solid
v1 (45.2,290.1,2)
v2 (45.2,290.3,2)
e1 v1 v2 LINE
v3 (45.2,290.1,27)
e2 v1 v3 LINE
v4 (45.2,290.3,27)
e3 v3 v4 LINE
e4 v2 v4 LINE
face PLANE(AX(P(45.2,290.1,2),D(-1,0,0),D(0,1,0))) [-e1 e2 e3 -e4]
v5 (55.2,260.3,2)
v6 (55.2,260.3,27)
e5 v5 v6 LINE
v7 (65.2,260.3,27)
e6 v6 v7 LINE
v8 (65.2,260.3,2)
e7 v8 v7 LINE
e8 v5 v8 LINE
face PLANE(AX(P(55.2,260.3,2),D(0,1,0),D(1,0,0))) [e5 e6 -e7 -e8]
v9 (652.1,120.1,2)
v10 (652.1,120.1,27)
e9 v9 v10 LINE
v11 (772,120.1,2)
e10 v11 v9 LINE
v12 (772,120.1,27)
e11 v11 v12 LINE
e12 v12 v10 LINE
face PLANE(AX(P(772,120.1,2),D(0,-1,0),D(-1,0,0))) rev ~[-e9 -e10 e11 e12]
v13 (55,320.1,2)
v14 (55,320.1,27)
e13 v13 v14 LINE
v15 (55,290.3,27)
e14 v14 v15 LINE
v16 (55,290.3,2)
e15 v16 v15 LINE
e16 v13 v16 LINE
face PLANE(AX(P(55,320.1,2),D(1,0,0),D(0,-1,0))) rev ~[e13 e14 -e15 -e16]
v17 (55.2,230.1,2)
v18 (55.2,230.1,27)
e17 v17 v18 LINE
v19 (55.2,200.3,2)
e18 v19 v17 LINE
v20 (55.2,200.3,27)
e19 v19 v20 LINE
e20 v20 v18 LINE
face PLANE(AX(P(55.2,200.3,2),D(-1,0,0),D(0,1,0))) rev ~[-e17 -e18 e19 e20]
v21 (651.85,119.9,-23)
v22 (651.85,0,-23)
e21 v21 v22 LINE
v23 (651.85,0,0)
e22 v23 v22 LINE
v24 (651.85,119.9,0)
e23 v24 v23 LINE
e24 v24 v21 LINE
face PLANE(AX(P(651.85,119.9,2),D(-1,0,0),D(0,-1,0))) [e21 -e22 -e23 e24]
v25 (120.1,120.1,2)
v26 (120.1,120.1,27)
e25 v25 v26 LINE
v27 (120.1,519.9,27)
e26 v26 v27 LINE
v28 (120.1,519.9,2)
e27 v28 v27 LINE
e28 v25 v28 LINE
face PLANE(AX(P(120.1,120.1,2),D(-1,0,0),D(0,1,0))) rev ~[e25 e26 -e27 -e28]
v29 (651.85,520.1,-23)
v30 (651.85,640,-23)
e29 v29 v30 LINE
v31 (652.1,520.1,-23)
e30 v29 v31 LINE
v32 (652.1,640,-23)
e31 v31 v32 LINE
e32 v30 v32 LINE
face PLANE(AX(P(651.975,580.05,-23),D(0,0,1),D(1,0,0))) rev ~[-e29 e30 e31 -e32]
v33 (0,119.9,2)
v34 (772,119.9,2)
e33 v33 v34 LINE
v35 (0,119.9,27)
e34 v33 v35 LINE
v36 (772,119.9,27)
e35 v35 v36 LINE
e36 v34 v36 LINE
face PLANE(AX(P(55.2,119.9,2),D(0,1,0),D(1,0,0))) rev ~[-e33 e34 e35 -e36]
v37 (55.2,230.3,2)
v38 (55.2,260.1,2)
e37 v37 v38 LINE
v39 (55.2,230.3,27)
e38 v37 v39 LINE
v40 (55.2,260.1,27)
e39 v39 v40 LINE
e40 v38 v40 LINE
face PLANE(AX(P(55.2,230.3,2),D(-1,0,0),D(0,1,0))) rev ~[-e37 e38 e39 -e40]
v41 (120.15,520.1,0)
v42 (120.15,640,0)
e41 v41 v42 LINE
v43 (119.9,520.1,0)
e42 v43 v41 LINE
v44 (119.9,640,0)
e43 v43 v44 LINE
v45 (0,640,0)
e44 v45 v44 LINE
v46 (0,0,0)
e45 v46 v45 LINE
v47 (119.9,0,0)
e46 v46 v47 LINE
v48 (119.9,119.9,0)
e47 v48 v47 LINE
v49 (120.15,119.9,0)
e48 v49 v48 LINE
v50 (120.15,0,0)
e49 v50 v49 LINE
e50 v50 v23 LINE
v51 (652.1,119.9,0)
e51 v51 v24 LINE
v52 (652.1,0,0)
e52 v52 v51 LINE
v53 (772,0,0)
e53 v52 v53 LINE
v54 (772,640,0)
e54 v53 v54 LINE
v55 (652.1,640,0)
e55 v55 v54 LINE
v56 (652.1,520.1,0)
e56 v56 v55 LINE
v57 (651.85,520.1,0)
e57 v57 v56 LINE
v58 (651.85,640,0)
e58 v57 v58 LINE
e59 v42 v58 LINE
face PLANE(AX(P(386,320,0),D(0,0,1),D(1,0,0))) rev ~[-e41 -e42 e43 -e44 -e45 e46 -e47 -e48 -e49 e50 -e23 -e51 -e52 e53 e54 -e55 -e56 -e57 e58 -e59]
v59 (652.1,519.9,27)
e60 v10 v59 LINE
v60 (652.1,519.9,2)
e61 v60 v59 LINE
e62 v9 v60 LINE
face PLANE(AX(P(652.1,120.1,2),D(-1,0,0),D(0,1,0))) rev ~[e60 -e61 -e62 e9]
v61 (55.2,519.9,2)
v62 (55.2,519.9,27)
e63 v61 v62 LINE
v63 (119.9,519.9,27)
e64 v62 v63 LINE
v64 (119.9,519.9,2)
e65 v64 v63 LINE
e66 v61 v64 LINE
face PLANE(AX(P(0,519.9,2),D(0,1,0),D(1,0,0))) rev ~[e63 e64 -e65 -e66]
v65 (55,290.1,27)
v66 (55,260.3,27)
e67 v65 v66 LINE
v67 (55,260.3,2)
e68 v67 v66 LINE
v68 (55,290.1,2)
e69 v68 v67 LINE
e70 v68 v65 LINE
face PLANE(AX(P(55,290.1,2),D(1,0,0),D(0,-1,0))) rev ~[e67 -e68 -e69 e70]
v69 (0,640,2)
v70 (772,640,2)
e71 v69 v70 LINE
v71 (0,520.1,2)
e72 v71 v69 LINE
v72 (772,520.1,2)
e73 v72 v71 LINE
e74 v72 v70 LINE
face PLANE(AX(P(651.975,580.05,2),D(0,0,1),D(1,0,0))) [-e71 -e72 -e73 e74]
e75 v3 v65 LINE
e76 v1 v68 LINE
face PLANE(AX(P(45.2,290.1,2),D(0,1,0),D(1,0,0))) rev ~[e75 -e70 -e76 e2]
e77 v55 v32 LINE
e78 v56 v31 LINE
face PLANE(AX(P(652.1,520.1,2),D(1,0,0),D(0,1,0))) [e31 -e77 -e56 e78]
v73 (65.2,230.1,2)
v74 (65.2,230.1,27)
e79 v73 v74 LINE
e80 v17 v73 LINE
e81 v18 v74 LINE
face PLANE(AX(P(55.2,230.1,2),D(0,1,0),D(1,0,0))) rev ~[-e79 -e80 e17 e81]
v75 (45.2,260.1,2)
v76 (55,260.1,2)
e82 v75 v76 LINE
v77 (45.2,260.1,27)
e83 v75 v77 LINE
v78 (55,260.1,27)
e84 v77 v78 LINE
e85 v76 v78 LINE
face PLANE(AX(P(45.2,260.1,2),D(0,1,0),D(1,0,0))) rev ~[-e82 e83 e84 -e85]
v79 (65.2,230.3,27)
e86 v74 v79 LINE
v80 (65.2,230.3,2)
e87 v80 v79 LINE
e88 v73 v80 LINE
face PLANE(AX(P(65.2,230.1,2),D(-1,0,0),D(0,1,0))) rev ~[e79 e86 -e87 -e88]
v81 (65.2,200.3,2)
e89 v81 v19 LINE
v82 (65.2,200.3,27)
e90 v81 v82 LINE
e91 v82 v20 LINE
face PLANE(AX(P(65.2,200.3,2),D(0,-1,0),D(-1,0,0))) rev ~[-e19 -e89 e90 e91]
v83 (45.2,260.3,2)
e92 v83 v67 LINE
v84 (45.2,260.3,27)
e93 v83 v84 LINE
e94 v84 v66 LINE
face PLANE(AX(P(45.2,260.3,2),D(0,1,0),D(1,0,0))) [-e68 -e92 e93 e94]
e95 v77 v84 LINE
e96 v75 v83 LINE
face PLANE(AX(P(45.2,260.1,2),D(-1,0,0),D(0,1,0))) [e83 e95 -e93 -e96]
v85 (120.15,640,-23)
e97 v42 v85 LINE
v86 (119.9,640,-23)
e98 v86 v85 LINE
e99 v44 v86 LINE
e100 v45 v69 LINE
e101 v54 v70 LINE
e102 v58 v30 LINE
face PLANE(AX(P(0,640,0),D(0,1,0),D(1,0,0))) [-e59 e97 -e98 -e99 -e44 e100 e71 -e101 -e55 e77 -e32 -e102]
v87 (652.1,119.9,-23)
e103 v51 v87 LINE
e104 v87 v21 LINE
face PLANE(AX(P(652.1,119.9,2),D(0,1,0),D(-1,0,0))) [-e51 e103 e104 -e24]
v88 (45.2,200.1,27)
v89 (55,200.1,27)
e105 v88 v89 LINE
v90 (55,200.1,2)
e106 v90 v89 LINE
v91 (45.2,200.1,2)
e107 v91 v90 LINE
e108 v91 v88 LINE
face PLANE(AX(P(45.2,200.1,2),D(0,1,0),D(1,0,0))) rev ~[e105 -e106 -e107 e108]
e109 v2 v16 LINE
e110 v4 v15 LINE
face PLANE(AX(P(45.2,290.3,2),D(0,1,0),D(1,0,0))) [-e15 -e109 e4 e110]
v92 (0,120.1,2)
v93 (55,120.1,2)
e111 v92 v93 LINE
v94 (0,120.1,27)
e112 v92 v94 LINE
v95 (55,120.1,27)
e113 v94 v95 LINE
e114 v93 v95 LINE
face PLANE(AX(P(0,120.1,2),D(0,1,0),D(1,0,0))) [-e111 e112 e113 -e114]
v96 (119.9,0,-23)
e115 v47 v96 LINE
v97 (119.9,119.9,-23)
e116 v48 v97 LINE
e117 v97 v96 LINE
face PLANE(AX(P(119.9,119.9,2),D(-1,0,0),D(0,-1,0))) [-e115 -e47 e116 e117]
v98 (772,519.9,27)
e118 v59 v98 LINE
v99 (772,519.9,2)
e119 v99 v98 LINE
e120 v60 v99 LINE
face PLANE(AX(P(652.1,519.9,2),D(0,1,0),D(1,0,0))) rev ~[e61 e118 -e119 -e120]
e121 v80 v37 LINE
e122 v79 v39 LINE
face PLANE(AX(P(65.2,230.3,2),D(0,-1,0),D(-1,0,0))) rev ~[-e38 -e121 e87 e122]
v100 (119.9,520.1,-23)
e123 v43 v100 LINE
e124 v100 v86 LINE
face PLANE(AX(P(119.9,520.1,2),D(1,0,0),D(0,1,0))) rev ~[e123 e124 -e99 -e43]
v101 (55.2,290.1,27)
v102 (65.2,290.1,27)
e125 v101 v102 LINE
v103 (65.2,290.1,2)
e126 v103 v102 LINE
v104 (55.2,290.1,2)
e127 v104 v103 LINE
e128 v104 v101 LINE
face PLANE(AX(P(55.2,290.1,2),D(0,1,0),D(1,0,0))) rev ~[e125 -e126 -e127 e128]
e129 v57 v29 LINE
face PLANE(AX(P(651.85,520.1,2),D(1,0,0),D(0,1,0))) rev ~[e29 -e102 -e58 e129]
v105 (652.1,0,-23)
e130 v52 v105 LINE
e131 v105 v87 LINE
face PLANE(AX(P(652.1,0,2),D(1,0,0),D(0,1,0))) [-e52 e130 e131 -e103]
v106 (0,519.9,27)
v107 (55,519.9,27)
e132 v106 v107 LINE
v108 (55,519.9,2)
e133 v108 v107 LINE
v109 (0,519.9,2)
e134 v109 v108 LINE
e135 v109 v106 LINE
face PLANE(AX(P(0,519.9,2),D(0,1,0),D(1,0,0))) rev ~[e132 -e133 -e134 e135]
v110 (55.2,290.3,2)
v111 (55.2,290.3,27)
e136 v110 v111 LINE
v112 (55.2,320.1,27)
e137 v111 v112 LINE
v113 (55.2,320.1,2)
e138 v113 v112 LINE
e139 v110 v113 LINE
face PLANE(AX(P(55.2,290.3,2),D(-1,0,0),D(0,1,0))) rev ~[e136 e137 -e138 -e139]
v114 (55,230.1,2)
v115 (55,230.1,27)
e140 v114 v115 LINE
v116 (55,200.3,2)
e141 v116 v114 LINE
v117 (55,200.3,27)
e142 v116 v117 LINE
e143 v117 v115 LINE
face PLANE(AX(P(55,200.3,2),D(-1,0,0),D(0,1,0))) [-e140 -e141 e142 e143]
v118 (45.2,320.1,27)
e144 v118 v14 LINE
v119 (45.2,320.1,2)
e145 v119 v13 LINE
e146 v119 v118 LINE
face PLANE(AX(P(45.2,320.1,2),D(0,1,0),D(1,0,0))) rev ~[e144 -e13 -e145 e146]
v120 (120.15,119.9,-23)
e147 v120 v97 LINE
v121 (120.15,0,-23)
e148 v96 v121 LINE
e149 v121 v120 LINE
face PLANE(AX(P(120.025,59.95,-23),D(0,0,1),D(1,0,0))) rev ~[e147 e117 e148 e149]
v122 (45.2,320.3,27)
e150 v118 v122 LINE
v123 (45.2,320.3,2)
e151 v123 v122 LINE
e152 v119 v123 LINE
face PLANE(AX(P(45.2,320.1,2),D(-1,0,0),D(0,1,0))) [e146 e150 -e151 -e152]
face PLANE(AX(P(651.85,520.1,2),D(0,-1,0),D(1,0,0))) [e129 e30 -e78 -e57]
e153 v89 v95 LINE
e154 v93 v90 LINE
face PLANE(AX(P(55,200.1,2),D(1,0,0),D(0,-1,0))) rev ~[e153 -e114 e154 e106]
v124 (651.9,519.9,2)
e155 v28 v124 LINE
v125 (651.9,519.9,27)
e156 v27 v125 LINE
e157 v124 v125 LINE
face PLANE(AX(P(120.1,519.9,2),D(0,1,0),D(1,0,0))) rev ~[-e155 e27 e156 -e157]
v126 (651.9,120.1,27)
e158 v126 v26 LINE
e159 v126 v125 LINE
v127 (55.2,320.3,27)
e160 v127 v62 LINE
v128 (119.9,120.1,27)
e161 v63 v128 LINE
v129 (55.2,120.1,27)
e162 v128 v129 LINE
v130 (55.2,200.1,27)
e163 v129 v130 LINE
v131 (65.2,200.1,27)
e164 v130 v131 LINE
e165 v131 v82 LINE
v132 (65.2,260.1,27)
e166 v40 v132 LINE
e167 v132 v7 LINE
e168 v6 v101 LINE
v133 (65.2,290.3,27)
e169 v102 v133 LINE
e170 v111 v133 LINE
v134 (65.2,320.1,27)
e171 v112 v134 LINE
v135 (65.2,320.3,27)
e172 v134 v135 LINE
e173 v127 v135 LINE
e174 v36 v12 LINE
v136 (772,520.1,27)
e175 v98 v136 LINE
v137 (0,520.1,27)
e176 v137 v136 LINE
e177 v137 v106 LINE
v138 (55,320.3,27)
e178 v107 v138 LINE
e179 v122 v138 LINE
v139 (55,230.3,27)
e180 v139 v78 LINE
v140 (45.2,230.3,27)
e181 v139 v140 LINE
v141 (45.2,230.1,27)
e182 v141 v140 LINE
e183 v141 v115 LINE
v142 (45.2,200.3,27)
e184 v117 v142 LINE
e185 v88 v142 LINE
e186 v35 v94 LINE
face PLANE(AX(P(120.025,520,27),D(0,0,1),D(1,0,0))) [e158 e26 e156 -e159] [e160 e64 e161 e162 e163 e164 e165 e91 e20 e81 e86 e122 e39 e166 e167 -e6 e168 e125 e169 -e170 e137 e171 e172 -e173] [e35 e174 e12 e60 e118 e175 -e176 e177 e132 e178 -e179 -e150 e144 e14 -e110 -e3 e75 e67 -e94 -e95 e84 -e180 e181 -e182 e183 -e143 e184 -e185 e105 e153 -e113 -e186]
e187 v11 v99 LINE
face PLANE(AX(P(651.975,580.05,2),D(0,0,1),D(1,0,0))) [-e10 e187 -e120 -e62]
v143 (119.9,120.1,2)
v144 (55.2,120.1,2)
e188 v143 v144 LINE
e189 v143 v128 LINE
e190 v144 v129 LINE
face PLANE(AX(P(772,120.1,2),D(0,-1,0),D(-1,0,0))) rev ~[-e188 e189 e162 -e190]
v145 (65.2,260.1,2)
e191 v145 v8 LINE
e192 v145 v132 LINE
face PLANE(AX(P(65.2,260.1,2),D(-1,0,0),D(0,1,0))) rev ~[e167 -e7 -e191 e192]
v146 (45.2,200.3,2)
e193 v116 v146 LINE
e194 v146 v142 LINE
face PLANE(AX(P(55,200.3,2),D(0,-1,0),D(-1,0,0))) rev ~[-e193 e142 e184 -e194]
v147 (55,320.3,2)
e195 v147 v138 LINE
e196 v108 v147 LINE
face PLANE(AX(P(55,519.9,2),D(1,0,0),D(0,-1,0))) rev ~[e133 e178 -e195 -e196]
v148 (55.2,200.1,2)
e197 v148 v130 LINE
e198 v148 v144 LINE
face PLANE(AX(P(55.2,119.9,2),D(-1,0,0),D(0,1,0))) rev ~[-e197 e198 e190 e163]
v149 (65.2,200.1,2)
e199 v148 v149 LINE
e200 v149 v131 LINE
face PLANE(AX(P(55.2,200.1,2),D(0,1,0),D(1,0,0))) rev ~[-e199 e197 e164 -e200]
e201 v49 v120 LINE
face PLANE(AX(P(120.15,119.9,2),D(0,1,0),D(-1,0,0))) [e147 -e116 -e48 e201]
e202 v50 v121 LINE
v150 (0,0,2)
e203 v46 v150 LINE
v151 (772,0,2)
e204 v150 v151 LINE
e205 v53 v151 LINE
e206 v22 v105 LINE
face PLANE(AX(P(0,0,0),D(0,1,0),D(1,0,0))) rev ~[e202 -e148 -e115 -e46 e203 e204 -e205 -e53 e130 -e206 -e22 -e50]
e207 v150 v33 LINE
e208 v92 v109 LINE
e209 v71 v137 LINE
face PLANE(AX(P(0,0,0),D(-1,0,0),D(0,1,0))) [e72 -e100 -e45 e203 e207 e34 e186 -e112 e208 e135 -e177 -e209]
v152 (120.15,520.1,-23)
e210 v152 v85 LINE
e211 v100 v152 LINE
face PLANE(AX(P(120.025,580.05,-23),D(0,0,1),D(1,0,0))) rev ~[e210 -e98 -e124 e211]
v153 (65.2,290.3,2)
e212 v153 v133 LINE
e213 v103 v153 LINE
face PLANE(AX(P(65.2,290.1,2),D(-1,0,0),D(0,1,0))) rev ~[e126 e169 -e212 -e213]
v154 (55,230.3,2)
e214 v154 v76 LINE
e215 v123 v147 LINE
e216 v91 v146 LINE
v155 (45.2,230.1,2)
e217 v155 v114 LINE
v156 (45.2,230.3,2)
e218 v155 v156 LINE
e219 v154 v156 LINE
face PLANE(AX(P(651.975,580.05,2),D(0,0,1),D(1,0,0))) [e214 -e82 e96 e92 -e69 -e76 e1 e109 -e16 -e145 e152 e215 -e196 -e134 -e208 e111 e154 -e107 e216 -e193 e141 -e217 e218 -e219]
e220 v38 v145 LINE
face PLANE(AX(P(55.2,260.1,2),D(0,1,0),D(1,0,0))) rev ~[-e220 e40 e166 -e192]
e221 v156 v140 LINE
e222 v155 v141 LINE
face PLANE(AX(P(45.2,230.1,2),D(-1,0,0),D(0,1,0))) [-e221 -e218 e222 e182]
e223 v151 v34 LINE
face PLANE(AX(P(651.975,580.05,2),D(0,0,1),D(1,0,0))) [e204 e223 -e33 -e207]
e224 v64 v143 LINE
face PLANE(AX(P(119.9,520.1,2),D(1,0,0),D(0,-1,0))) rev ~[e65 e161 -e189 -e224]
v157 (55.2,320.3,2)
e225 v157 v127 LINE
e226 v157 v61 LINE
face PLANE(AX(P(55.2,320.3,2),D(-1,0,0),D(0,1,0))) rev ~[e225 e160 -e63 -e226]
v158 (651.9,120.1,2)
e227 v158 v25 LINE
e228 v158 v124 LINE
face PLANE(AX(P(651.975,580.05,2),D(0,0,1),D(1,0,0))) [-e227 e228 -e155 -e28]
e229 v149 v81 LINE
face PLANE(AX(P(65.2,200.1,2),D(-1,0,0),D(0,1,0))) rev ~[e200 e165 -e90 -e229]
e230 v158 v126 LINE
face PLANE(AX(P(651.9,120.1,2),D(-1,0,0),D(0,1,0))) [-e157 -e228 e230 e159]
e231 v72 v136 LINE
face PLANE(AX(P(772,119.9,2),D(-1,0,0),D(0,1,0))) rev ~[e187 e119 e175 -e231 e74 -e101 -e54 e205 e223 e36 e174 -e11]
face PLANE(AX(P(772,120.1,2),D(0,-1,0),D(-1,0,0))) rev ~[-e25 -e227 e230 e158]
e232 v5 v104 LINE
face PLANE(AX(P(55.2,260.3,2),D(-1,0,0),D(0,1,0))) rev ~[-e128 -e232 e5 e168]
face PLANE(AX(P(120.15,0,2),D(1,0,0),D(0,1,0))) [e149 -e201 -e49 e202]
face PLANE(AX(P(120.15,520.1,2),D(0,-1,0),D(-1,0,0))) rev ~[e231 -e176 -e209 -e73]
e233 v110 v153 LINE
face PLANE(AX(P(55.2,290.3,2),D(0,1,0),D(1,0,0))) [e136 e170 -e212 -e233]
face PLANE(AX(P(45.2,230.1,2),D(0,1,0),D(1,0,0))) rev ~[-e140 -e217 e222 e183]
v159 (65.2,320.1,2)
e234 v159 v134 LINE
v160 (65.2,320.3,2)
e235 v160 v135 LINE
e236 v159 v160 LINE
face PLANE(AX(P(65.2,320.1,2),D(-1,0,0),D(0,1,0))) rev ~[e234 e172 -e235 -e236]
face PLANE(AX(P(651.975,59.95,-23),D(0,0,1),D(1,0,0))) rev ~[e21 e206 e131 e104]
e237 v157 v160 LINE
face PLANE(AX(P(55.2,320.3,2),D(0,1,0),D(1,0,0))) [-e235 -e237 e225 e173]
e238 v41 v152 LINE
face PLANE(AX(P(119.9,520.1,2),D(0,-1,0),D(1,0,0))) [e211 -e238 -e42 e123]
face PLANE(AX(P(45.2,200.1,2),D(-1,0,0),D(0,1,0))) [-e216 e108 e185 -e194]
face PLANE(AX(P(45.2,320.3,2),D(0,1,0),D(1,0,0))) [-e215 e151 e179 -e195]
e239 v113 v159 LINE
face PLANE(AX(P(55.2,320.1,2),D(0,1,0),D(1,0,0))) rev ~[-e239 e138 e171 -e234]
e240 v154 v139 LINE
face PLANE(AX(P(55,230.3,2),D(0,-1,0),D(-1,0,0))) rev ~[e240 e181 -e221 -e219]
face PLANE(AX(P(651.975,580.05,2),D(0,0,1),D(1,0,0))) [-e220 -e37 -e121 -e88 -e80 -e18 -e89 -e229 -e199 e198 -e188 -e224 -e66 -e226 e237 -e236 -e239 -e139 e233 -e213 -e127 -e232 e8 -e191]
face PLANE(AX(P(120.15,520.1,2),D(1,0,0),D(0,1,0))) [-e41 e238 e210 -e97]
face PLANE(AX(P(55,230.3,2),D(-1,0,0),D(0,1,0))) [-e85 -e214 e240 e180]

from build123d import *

# Parameters (mm, degrees)
F0_W     = 772
F0_H     = 640
F1_DEPTH = 2
F2_W     = 0.25
F2_H     = 119.9
F3_DEPTH = 25
F4_DEPTH = 25
F2_W_2   = 119.9
F2_H_2   = 0.2
F2_W_3   = 0.2
F2_H_3   = 399.8
F5_DEPTH = 25
F2_W_4   = 64.7
F6_DEPTH = 25
F2_W_5   = 55
F7_DEPTH = 25
F2_H_4   = 49.5626640439
F8_DEPTH = 25
F2_H_5   = 199.6
F2_W_6   = 9.8
F2_H_6   = 30.4373359561
F2_W_7   = 10
F2_H_7   = 29.8
F9_DEPTH = 25


# Not quite as in the source:
# - a feature names something its author has since deleted; it is built from what else it names


with BuildPart() as f1:
    # F0 (on Top) → F1 (new body)
    with BuildSketch(Plane.XY):
        with Locations((386, 320)):
            Rectangle(F0_W, F0_H)
    extrude(amount=F1_DEPTH)

    # F2 (on face) → F3 (join)
    with BuildSketch(Plane.XY.offset(2)):
        with Locations((651.975, 580.05)):
            Rectangle(F2_W, F2_H)
        with Locations((120.025, 580.05)):
            Rectangle(F2_W, F2_H)
        Polygon((120.1, 119.9), (119.9, 119.9), (119.9, 0), (120.15, 0), (120.15, 119.9), align=None)
        Polygon((652.1, 119.9), (651.9, 119.9), (651.85, 119.9), (651.85, 0), (652.1, 0), align=None)
    extrude(amount=-F3_DEPTH)

    # F2 (on face) → F4 (join)
    with BuildSketch(Plane.XY.offset(2)):
        Polygon((119.9, 520.1), (0, 520.1), (0, 519.9), (55, 519.9), (55.2, 519.9), (119.9, 519.9), align=None)
        Polygon((651.85, 520.1), (120.15, 520.1), (120.15, 519.9), (651.9, 519.9), (652.1, 519.9), (652.1, 520.1), align=None)
    extrude(amount=F4_DEPTH)

    # F2 (on face) → F5 (join)
    with BuildSketch(Plane.XY.offset(2)):
        with Locations((712.05, 520)):
            Rectangle(F2_W_2, F2_H_2)
        with Locations((652, 320)):
            Rectangle(F2_W_3, F2_H_3)
    extrude(amount=F5_DEPTH)

    # F2 (on face) → F6 (join)
    with BuildSketch(Plane.XY.offset(2)):
        with Locations((712.05, 120)):
            Rectangle(F2_W_2, F2_H_2)
        Polygon((651.9, 120.1), (120.1, 120.1), (120.1, 119.9), (120.15, 119.9), (651.85, 119.9), (651.9, 119.9), align=None)
        with Locations((652, 120)):
            Rectangle(F2_W_3, F2_H_2)
        with Locations((87.55, 120)):
            Rectangle(F2_W_4, F2_H_2)
        with Locations((120, 120)):
            Rectangle(F2_W_3, F2_H_2)
    extrude(amount=F6_DEPTH)

    # F2 (on face) → F7 (join)
    with BuildSketch(Plane.XY.offset(2)):
        with Locations((27.5, 120)):
            Rectangle(F2_W_5, F2_H_2)
    extrude(amount=F7_DEPTH)

    # F2 (on face) → F8 (join)
    with BuildSketch(Plane.XY.offset(2)):
        with Locations((55.1, 175.318667978)):
            Rectangle(F2_W_3, F2_H_4)
    extrude(amount=F8_DEPTH)

    # F2 (on face) → F9 (join)
    with BuildSketch(Plane.XY.offset(2)):
        Polygon((120.15, 520.1), (119.9, 520.1), (119.9, 519.9), (120.1, 519.9), (120.15, 519.9), align=None)
        with Locations((120, 320)):
            Rectangle(F2_W_3, F2_H_3)
        with Locations((55.1, 420.1)):
            Rectangle(F2_W_3, F2_H_5)
        with Locations((55.1, 320.2)):
            Rectangle(F2_W_3, F2_H_2)
        with Locations((50.1, 320.2)):
            Rectangle(F2_W_6, F2_H_2)
        with Locations((55.1, 135.318667978)):
            Rectangle(F2_W_3, F2_H_6)
        with Locations((55.1, 120)):
            Rectangle(F2_W_3, F2_H_2)
        with Locations((60.2, 320.2)):
            Rectangle(F2_W_7, F2_H_2)
        with Locations((55.1, 305.2)):
            Rectangle(F2_W_3, F2_H_7)
        with Locations((55.1, 175.318667978)):
            Rectangle(F2_W_3, F2_H_4)
        with Locations((55.1, 290.2)):
            Rectangle(F2_W_3, F2_H_2)
        with Locations((50.1, 290.2)):
            Rectangle(F2_W_6, F2_H_2)
        with Locations((50.1, 200.2)):
            Rectangle(F2_W_6, F2_H_2)
        with Locations((55.1, 200.2)):
            Rectangle(F2_W_3, F2_H_2)
        with Locations((60.2, 290.2)):
            Rectangle(F2_W_7, F2_H_2)
        with Locations((60.2, 200.2)):
            Rectangle(F2_W_7, F2_H_2)
        with Locations((55.1, 275.2)):
            Rectangle(F2_W_3, F2_H_7)
        with Locations((55.1, 215.2)):
            Rectangle(F2_W_3, F2_H_7)
        with Locations((55.1, 260.2)):
            Rectangle(F2_W_3, F2_H_2)
        with Locations((50.1, 260.2)):
            Rectangle(F2_W_6, F2_H_2)
        with Locations((50.1, 230.2)):
            Rectangle(F2_W_6, F2_H_2)
        with Locations((55.1, 230.2)):
            Rectangle(F2_W_3, F2_H_2)
        with Locations((60.2, 260.2)):
            Rectangle(F2_W_7, F2_H_2)
        with Locations((60.2, 230.2)):
            Rectangle(F2_W_7, F2_H_2)
        with Locations((55.1, 245.2)):
            Rectangle(F2_W_3, F2_H_7)
    extrude(amount=F9_DEPTH)


solid = f1.part
